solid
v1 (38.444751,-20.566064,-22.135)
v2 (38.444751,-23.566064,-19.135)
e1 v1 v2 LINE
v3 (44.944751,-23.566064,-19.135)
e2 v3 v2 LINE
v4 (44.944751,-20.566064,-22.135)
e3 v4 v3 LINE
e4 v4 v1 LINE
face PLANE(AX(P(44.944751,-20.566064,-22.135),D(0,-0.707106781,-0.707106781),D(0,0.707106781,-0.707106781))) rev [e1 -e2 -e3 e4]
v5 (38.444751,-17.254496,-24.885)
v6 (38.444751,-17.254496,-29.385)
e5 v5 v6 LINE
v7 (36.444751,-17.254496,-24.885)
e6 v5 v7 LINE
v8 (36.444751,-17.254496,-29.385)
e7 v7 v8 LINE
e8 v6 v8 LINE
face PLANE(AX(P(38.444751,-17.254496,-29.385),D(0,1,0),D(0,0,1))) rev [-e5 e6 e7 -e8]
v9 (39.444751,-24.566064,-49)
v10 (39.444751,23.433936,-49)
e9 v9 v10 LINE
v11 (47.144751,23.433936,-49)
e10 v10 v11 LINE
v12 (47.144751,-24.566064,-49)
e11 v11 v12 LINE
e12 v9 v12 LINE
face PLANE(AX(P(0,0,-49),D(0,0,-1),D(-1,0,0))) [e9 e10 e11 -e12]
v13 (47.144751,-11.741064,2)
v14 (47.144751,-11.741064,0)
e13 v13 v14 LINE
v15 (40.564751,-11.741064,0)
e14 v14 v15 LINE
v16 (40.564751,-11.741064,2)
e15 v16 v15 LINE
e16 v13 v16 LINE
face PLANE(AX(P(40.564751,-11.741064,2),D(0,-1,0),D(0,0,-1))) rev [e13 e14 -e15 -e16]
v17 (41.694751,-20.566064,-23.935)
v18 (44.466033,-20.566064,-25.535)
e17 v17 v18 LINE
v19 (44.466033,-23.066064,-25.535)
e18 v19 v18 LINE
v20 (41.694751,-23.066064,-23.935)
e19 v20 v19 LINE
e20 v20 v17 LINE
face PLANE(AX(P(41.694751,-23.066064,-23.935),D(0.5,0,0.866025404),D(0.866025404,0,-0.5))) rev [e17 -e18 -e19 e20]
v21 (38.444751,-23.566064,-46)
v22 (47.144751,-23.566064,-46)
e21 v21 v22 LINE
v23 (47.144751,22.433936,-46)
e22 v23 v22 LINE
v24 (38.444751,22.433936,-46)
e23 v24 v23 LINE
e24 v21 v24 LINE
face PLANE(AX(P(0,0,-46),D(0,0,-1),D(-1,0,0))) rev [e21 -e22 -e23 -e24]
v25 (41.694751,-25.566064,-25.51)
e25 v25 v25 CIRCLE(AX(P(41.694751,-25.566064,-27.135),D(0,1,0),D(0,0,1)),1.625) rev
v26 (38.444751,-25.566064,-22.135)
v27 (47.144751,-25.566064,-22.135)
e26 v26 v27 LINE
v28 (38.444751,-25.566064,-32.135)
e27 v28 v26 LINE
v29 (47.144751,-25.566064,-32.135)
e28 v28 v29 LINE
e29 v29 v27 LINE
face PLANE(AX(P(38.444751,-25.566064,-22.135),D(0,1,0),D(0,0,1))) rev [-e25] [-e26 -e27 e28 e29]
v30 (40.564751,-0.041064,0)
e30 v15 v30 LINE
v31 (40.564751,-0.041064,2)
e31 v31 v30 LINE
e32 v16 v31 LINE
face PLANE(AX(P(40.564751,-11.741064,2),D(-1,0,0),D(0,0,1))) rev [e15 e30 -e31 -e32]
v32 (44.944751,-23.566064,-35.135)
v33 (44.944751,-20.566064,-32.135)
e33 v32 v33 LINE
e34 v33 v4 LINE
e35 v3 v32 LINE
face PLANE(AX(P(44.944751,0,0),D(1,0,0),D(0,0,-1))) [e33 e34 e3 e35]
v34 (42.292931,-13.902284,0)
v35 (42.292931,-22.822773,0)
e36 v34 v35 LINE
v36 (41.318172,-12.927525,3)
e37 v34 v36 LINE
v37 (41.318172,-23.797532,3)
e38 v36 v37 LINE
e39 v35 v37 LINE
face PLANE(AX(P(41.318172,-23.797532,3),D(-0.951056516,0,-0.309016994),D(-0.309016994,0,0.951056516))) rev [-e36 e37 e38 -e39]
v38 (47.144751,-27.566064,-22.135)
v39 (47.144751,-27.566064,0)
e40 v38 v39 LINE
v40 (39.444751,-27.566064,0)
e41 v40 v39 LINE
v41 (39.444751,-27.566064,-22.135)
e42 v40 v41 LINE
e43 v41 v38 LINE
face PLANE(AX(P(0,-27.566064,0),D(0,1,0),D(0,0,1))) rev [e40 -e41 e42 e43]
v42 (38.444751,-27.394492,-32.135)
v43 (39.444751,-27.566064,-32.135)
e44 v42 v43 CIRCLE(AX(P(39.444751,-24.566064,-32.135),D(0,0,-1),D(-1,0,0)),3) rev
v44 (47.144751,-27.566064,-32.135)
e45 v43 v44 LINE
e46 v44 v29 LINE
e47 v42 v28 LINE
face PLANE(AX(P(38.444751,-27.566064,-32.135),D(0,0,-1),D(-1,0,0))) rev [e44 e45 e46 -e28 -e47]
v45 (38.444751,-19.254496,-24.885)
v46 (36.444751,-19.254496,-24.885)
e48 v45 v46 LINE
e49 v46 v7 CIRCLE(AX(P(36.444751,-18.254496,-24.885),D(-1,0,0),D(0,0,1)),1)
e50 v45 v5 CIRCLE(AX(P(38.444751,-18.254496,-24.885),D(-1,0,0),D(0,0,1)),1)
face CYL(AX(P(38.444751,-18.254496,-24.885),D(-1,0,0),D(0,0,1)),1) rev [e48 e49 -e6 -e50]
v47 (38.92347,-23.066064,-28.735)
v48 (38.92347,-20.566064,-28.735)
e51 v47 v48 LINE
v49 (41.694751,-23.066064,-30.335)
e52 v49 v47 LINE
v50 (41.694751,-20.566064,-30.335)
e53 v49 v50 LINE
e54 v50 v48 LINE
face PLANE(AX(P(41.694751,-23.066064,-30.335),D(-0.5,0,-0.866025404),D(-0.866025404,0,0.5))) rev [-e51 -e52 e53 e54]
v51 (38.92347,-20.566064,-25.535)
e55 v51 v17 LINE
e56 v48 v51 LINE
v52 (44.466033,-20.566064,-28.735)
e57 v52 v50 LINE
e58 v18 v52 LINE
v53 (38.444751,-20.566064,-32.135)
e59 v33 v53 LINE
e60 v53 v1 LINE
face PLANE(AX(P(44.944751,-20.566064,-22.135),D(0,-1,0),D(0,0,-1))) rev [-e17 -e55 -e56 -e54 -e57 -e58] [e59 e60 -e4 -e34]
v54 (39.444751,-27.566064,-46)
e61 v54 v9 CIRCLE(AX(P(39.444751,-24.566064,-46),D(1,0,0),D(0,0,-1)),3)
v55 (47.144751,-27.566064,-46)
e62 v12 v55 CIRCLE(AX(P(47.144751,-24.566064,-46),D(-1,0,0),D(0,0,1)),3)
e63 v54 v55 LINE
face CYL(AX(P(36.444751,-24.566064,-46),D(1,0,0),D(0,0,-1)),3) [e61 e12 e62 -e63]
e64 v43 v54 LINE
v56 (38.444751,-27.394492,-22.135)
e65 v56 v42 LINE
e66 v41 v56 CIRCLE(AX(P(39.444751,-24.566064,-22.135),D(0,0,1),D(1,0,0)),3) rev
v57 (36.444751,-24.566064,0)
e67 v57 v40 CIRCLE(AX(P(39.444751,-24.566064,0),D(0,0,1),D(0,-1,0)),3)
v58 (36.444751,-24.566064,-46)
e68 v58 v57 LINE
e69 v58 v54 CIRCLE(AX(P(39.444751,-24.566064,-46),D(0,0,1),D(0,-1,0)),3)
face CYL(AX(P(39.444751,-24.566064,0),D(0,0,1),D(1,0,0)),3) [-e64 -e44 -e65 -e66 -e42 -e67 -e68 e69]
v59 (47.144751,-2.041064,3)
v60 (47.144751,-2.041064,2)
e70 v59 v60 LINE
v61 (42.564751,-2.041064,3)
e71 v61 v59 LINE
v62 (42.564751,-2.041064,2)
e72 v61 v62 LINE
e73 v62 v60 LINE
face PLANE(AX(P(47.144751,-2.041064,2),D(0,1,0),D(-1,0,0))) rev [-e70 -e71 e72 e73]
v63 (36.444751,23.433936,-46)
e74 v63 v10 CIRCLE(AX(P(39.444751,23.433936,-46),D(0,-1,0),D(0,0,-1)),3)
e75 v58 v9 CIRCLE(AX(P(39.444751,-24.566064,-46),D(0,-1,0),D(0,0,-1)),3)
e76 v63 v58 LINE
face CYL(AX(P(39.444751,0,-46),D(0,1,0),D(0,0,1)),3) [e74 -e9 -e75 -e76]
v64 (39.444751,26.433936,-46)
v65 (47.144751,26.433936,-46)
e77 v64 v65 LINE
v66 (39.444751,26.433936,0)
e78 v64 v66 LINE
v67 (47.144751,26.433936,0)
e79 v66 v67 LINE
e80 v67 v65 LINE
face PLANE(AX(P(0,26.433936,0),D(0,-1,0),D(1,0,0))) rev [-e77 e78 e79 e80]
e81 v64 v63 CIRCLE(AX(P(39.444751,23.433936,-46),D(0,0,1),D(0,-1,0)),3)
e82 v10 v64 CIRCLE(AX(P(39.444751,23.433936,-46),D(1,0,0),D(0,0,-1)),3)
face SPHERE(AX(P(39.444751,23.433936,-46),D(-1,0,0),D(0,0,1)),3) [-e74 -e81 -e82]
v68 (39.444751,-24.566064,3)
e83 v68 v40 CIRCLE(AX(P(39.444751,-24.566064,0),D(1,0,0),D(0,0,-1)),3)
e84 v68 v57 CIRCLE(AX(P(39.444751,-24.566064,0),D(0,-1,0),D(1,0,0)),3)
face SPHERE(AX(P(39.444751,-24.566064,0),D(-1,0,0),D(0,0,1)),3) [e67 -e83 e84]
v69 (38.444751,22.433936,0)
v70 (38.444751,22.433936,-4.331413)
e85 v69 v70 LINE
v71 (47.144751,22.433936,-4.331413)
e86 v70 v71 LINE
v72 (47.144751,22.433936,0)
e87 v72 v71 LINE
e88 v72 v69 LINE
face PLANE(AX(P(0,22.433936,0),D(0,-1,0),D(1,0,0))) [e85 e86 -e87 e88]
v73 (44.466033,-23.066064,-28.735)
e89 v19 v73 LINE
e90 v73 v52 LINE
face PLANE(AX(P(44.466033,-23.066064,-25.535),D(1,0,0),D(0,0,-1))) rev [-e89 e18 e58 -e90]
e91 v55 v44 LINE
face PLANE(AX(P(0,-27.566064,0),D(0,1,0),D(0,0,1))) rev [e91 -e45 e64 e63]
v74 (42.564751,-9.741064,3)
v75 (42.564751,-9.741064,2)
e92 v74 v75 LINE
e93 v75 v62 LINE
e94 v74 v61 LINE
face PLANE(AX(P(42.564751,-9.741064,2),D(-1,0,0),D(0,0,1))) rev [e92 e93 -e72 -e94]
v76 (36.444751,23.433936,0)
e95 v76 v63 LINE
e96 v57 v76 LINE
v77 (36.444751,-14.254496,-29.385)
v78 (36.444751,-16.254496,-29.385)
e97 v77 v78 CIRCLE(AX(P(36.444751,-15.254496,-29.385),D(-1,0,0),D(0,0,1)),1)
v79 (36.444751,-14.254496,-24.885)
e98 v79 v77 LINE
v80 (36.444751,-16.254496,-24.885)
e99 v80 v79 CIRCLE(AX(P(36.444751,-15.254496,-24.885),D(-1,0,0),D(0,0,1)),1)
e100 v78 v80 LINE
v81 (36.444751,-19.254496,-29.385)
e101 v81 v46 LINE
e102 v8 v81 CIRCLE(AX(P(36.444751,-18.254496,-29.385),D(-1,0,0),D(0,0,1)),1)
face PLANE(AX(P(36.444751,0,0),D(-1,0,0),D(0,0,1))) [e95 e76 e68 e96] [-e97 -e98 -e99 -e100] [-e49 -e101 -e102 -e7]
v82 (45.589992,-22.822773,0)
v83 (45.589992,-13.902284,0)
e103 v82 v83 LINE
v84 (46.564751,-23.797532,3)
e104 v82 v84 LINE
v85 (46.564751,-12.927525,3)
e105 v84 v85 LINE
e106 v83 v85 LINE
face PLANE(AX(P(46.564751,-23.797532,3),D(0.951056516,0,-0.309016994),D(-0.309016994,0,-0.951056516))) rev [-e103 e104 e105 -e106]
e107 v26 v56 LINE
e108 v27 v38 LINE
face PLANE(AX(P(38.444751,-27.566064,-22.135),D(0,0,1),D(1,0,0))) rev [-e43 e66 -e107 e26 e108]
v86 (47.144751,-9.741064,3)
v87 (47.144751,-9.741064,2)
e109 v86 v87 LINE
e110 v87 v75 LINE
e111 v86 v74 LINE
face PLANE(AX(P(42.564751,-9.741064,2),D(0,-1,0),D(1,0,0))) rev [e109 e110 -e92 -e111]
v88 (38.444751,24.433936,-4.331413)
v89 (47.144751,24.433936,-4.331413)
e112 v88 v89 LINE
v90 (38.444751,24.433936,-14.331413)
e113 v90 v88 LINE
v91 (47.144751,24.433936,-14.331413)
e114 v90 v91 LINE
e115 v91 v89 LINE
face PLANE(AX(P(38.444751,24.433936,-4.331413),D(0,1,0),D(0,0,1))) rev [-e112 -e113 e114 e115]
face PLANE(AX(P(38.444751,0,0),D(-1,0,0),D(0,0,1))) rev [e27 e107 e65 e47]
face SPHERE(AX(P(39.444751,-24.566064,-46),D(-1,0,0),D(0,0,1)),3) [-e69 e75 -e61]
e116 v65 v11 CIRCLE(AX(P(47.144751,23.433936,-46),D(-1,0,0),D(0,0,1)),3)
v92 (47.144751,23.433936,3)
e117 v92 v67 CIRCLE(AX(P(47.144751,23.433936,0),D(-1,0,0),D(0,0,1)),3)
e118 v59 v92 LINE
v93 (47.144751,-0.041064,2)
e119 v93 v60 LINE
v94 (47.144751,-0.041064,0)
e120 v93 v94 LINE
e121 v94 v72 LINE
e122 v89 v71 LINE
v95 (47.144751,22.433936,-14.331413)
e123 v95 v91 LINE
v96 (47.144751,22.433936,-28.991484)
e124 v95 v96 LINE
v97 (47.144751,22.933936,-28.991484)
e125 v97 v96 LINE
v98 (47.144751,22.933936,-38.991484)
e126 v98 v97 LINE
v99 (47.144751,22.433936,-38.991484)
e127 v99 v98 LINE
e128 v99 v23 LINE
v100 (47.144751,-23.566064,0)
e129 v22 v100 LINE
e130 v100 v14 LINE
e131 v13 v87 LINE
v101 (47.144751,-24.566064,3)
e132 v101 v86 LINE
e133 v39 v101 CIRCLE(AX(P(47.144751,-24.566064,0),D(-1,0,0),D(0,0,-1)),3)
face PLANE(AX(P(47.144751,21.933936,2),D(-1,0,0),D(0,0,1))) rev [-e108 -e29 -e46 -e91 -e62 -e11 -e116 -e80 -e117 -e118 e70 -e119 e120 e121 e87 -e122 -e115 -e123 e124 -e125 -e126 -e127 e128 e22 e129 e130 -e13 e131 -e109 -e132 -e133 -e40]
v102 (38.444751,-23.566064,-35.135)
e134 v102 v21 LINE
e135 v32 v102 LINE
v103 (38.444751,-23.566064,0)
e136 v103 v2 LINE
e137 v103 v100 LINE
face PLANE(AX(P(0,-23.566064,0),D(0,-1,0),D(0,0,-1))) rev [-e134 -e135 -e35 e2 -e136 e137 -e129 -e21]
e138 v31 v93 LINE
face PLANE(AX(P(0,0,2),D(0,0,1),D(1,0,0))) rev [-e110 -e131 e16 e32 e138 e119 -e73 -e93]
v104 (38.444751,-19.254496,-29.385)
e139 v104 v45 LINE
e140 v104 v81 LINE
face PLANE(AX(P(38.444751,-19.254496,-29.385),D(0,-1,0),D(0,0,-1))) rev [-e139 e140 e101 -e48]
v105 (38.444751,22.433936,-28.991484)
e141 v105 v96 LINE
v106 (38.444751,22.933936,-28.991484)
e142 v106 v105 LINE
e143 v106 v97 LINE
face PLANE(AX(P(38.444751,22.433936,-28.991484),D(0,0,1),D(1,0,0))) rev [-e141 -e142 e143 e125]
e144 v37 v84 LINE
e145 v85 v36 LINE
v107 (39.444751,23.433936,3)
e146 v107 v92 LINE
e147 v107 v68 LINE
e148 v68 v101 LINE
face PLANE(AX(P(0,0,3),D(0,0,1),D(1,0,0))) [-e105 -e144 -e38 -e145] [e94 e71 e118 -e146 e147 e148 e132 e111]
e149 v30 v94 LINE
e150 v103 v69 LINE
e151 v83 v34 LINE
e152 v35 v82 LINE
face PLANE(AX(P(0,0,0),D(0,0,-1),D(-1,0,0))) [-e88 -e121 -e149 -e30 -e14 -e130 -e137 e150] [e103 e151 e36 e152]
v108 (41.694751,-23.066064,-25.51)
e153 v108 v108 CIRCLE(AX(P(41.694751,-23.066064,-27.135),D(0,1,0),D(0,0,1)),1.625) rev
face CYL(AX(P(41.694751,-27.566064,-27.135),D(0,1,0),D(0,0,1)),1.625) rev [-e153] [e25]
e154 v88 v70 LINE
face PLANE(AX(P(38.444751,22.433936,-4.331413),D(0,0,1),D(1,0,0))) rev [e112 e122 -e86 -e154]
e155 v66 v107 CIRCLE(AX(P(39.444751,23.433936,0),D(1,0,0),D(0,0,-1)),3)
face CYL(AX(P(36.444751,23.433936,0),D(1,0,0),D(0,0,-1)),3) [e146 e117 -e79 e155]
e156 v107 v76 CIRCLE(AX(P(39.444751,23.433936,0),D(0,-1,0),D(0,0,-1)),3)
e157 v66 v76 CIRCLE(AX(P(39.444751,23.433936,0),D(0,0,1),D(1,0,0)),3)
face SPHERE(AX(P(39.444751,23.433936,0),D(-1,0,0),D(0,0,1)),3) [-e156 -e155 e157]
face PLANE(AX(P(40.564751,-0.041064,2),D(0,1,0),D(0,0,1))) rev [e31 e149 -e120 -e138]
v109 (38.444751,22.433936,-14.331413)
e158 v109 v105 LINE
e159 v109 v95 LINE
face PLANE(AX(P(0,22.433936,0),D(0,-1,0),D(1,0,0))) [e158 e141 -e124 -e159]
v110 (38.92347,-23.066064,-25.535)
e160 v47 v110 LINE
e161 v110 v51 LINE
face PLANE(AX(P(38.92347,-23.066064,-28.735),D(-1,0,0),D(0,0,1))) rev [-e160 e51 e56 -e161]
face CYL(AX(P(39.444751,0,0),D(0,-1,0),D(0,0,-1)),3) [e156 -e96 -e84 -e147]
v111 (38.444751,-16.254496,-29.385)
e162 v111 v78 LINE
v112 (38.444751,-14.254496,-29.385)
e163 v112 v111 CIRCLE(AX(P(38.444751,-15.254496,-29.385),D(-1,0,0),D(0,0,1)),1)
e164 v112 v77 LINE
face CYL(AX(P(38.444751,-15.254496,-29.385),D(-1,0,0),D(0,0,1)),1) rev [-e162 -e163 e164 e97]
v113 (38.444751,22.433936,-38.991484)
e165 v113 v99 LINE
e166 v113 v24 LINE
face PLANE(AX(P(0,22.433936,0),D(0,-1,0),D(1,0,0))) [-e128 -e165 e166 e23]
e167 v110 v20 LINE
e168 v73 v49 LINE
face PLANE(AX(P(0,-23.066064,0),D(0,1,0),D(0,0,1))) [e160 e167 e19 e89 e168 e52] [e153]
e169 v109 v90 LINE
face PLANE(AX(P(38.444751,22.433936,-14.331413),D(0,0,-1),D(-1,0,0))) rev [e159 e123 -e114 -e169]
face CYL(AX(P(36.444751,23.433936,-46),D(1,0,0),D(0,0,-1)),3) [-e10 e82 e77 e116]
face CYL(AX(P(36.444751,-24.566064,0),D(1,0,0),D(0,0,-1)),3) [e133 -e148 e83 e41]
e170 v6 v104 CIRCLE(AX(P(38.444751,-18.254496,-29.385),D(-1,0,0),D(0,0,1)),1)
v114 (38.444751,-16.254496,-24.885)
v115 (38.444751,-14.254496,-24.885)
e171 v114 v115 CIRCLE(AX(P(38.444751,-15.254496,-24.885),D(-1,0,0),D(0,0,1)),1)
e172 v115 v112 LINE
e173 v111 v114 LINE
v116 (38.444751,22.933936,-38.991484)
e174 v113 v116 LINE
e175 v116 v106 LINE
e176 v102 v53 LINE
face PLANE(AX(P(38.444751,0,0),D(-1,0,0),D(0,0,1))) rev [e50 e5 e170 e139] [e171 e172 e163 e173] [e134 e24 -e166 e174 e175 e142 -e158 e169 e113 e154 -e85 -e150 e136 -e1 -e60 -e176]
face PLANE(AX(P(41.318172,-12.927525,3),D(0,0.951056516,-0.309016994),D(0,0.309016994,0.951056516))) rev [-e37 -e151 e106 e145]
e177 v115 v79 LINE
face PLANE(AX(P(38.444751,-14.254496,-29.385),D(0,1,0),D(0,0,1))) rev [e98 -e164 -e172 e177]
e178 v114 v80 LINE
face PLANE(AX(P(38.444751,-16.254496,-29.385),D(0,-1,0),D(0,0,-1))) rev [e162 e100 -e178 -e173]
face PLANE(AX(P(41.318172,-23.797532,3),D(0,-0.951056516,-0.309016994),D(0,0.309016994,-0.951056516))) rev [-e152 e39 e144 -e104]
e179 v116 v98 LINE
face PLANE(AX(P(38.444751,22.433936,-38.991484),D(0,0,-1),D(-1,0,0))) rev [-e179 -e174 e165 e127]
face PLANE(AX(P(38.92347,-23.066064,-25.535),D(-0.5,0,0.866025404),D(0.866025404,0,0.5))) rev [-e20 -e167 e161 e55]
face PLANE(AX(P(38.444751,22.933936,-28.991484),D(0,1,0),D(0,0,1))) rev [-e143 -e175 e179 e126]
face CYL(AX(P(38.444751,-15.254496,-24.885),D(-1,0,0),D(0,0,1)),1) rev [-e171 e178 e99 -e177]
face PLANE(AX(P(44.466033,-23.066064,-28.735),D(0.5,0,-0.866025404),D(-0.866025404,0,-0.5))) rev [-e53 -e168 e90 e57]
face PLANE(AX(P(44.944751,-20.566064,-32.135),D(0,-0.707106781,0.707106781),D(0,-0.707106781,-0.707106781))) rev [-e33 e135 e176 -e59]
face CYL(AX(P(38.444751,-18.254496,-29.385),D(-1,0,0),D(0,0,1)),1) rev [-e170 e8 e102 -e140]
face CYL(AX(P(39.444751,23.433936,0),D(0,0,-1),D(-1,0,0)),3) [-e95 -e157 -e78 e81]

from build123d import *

# Parameters (mm, degrees)
CROQUIS1_W                   = 3.246579248
CROQUIS1_H                   = 8.852829877
SALIENTE_EXTRUIR1_DEPTH      = 2
CROQUIS5_W                   = 9
CROQUIS5_H                   = 0.5
ARREGLO_IMPRESION1_DEPTH     = 2
CROQUIS6_W                   = 9
CROQUIS6_H                   = 48
SALIENTE_EXTRUIR4_DEPTH      = 2
CROQUIS7_W                   = 9
CROQUIS7_H                   = 48
SALIENTE_EXTRUIR5_DEPTH      = 2
CROQUIS8_W                   = 9
CROQUIS8_H                   = 50
SALIENTE_EXTRUIR6_DEPTH      = 2
SALIENTE_EXTRUIR7_DEPTH      = 1.7
SALIENTE_EXTRUIR7_DEPTH_BACK = 0.3
CROQUIS9_W                   = 50
CROQUIS9_H                   = 50
CROQUIS10_W                  = 10
CROQUIS10_H                  = 0.5
CORTAR_EXTRUIR1_DEPTH        = 8.700001
CROQUIS11_W                  = 3.246579248
CROQUIS11_H                  = 8.852829877
SALIENTE_EXTRUIR8_DEPTH      = 1
CROQUIS12_W                  = 10.7
CROQUIS12_H                  = 51
SALIENTE_EXTRUIR9_DEPTH      = 2
CROQUIS13_W                  = 10.7
CROQUIS13_H                  = 52
SALIENTE_EXTRUIR10_DEPTH     = 1
CROQUIS14_W                  = 10.7
CROQUIS14_H                  = 52
SALIENTE_EXTRUIR11_DEPTH     = 2
SALIENTE_EXTRUIR12_DEPTH     = 6.5
CORTAR_EXTRUIR2_START        = -7
CROQUIS19_R                  = 1.625
CORTAR_EXTRUIR2_DEPTH        = 7
CORTAR_EXTRUIR3_DEPTH        = 2.5
CROQUIS22_W                  = 10
CROQUIS22_H                  = 2
CORTAR_EXTRUIR4_DEPTH        = 8.7
CORTAR_EXTRUIR5_START        = -10.7
CORTAR_EXTRUIR5_DEPTH        = 10.7
REDONDEO4_R                  = 3
CROQUIS24_W                  = 5.246579248
CROQUIS24_H                  = 10.87000641
CORTAR_EXTRUIR6_DEPTH        = 3
CORTAR_EXTRUIR6_DRAFT        = -18
CROQUIS25_W                  = 6.58
CROQUIS25_H                  = 11.7
CORTAR_EXTRUIR7_DEPTH        = 2


with BuildPart() as part:
    # Croquis1 → Saliente-Extruir1 (new body)
    with BuildSketch(Plane.XY):
        Polygon((47.144751496, 21.933935563), (38.144751496, 21.933935563), (38.144751496, -23.066064437), (47.144751496, -23.066064437), (47.144751496, -9.741064437), (42.564751496, -9.741064437), (42.564751496, -2.041064437), (47.144751496, -2.041064437), align=None)
        with Locations((43.941461872, -18.353940173)):
            Rectangle(CROQUIS1_W, CROQUIS1_H, mode=Mode.SUBTRACT)
    extrude(amount=SALIENTE_EXTRUIR1_DEPTH)

    # Croquis5 → Arreglo_impresion1 (add)
    with BuildSketch(Plane.XY.offset(2)):
        with Locations((42.644751496, -23.316064437)):
            Rectangle(CROQUIS5_W, CROQUIS5_H)
        with Locations((42.644751496, 22.183935563)):
            Rectangle(CROQUIS5_W, CROQUIS5_H)
    extrude(amount=-ARREGLO_IMPRESION1_DEPTH)

    # Croquis6 → Saliente-Extruir4 (add)
    with BuildSketch(Plane.XZ.offset(23.566064437)):
        with Locations((42.644751496, -22)):
            Rectangle(CROQUIS6_W, CROQUIS6_H)
    extrude(amount=SALIENTE_EXTRUIR4_DEPTH)

    # Croquis7 → Saliente-Extruir5 (add)
    with BuildSketch(Plane(origin=(0, 0, -46), x_dir=(-1, 0, 0), z_dir=(0, 0, -1))):
        with Locations((-42.644751496, -1.566064437)):
            Rectangle(CROQUIS7_W, CROQUIS7_H)
    extrude(amount=SALIENTE_EXTRUIR5_DEPTH)

    # Croquis8 → Saliente-Extruir6 (add)
    with BuildSketch(Plane(origin=(0, 22.433935563, 0), x_dir=(1, 0, 0), z_dir=(0, 1, 0))):
        with Locations((42.644751496, 23)):
            Rectangle(CROQUIS8_W, CROQUIS8_H)
    extrude(amount=SALIENTE_EXTRUIR6_DEPTH)

    # Croquis9 → Saliente-Extruir7 (add, two sides: drawn at the far end of the back side and taken through both)
    with BuildSketch(Plane.ZY.offset(-38.144751496).offset(-SALIENTE_EXTRUIR7_DEPTH_BACK)):
        with Locations((-23, -0.566064437)):
            Rectangle(CROQUIS9_W, CROQUIS9_H)
        with BuildLine():
            Line((-29.385, -14.254496437), (-24.885, -14.254496437))
            ThreePointArc((-24.885, -14.254496437), (-23.885, -15.254496437), (-24.885, -16.254496437))
            Line((-24.885, -16.254496437), (-29.385, -16.254496437))
            ThreePointArc((-29.385, -16.254496437), (-30.385, -15.254496437), (-29.385, -14.254496437))
        make_face(mode=Mode.SUBTRACT)
        with BuildLine():
            Line((-29.385, -17.254496437), (-24.885, -17.254496437))
            ThreePointArc((-24.885, -17.254496437), (-23.885, -18.254496437), (-24.885, -19.254496437))
            Line((-24.885, -19.254496437), (-29.385, -19.254496437))
            ThreePointArc((-29.385, -19.254496437), (-30.385, -18.254496437), (-29.385, -17.254496437))
        make_face(mode=Mode.SUBTRACT)
    extrude(amount=SALIENTE_EXTRUIR7_DEPTH + SALIENTE_EXTRUIR7_DEPTH_BACK)

    # Croquis10 → Cortar-Extruir1 (cut)
    with BuildSketch(Plane(origin=(47.144751496, 0, 0), x_dir=(0, 0, -1), z_dir=(1, 0, 0))):
        with Locations((33.991483973, 22.683935563)):
            Rectangle(CROQUIS10_W, CROQUIS10_H)
    extrude(amount=-CORTAR_EXTRUIR1_DEPTH, mode=Mode.SUBTRACT)

    # Croquis11 → Saliente-Extruir8 (add)
    with BuildSketch(Plane.XY.offset(2)):
        Polygon((47.144751496, 24.433935563), (36.444751496, 24.433935563), (36.444751496, -25.566064437), (47.144751496, -25.566064437), (47.144751496, -9.741064437), (42.564751496, -9.741064437), (42.564751496, -2.041064437), (47.144751496, -2.041064437), align=None)
        with Locations((43.941461872, -18.353940173)):
            Rectangle(CROQUIS11_W, CROQUIS11_H, mode=Mode.SUBTRACT)
    extrude(amount=SALIENTE_EXTRUIR8_DEPTH)

    # Croquis12 → Saliente-Extruir9 (add)
    with BuildSketch(Plane.XZ.offset(25.566064437)):
        with Locations((41.794751496, -22.5)):
            Rectangle(CROQUIS12_W, CROQUIS12_H)
    extrude(amount=SALIENTE_EXTRUIR9_DEPTH)

    # Croquis13 → Saliente-Extruir10 (add)
    with BuildSketch(Plane(origin=(0, 0, -48), x_dir=(-1, 0, 0), z_dir=(0, 0, -1))):
        with Locations((-41.794751496, -1.566064437)):
            Rectangle(CROQUIS13_W, CROQUIS13_H)
    extrude(amount=SALIENTE_EXTRUIR10_DEPTH)

    # Croquis14 → Saliente-Extruir11 (add)
    with BuildSketch(Plane(origin=(0, 24.433935563, 0), x_dir=(1, 0, 0), z_dir=(0, 1, 0))):
        with Locations((41.794751496, 23)):
            Rectangle(CROQUIS14_W, CROQUIS14_H)
    extrude(amount=SALIENTE_EXTRUIR11_DEPTH)

    # Croquis17 → Saliente-Extruir12 (add)
    with BuildSketch(Plane(origin=(38.444751496, 0, 0), x_dir=(0, 0, -1), z_dir=(1, 0, 0))):
        Polygon((22.135, -20.566064437), (32.135, -20.566064437), (35.135, -23.566064437), (19.135, -23.566064437), align=None)
    extrude(amount=SALIENTE_EXTRUIR12_DEPTH)

    # Croquis19 → Cortar-Extruir2 (cut)
    with BuildSketch(Plane(origin=(0, -20.566064437, 0), x_dir=(1, 0, 0), z_dir=(0, 1, 0)).offset(CORTAR_EXTRUIR2_START)):
        with Locations(Location((41.694751496, 27.135, 0), (0, 0, 270))):
            Circle(CROQUIS19_R)
    extrude(amount=CORTAR_EXTRUIR2_DEPTH, mode=Mode.SUBTRACT)

    # Croquis20 → Cortar-Extruir3 (cut)
    with BuildSketch(Plane(origin=(0, -20.566064437, 0), x_dir=(1, 0, 0), z_dir=(0, 1, 0))):
        Polygon((41.694751496, 30.335), (38.923470204, 28.735), (38.923470204, 25.535), (41.694751496, 23.935), (44.466032788, 25.535), (44.466032788, 28.735), align=None)
    extrude(amount=-CORTAR_EXTRUIR3_DEPTH, mode=Mode.SUBTRACT)

    # Croquis22 → Cortar-Extruir4 (cut)
    with BuildSketch(Plane(origin=(47.144751496, 0, 0), x_dir=(0, 0, -1), z_dir=(1, 0, 0))):
        with Locations((27.135, -26.566064437)):
            Rectangle(CROQUIS22_W, CROQUIS22_H)
        with Locations((9.331412976, 23.433935563)):
            Rectangle(CROQUIS22_W, CROQUIS22_H)
    extrude(amount=-CORTAR_EXTRUIR4_DEPTH, mode=Mode.SUBTRACT)

    # Croquis23 → Cortar-Extruir5 (cut)
    with BuildSketch(Plane(origin=(47.144751496, 0, 0), x_dir=(0, 0, -1), z_dir=(1, 0, 0)).offset(CORTAR_EXTRUIR5_START)):
        with BuildLine():
            Line((-3, -27.566064437), (0, -27.566064437))
            ThreePointArc((0, -27.566064437), (-2.121320344, -26.687384781), (-3, -24.566064437))
            Line((-3, -24.566064437), (-3, -27.566064437))
        make_face()
        with BuildLine():
            Line((-3, 26.433935563), (0, 26.433935563))
            ThreePointArc((0, 26.433935563), (-2.121320344, 25.555255907), (-3, 23.433935563))
            Line((-3, 23.433935563), (-3, 26.433935563))
        make_face()
        with BuildLine():
            Line((49, 26.433935563), (49, 23.433935563))
            ThreePointArc((49, 23.433935563), (48.121320344, 25.555255907), (46, 26.433935563))
            Line((46, 26.433935563), (49, 26.433935563))
        make_face()
        with BuildLine():
            Line((49, -27.566064437), (46, -27.566064437))
            ThreePointArc((46, -27.566064437), (48.121320344, -26.687384781), (49, -24.566064437))
            Line((49, -24.566064437), (49, -27.566064437))
        make_face()
    extrude(amount=CORTAR_EXTRUIR5_DEPTH, mode=Mode.SUBTRACT)

    # Redondeo4
    # the kernel refuses this fillet: 3 mm, written as the material it takes off along each edge
    with BuildSketch(Plane(origin=(36.444751496, -24.566064437, 0), x_dir=(0, -1, 0), z_dir=(0, 0, -1))) as redondeo4_piece_1:
        with BuildLine():
            CenterArc((3 - REDONDEO4_R, -REDONDEO4_R), REDONDEO4_R, 360, 90)
            Line((3, -REDONDEO4_R), (3, 0))
            Line((3, 0), (3 - REDONDEO4_R, 0))
        make_face()
    revolve(axis=Axis((36.444751496, -24.566064437, 0), (-1, 0, 0)), revolution_arc=90, mode=Mode.SUBTRACT)
    with BuildSketch(Plane(origin=(36.444751496, -24.566064437, 3), x_dir=(0, 0, -1), z_dir=(0, 1, 0)), Plane(origin=(36.444751496, 23.433935563, -49), x_dir=(0, 0, 1), z_dir=(0, -1, 0))) as redondeo4_piece_2:
        with BuildLine():
            CenterArc((REDONDEO4_R, -REDONDEO4_R), REDONDEO4_R, 90, 90)
            Line((0, -REDONDEO4_R), (0, 0))
            Line((0, 0), (REDONDEO4_R, 0))
        make_face()
    extrude(amount=48, mode=Mode.SUBTRACT)
    with BuildSketch(Plane(origin=(36.444751496, 23.433935563, 0), x_dir=(0, 1, 0), z_dir=(0, 0, -1))) as redondeo4_piece_3:
        with BuildLine():
            CenterArc((3 - REDONDEO4_R, REDONDEO4_R), REDONDEO4_R, 270, 90)
            Line((3, REDONDEO4_R), (3, 0))
            Line((3, 0), (3 - REDONDEO4_R, 0))
        make_face()
    revolve(axis=Axis((36.444751496, 23.433935563, 0), (1, 0, 0)), revolution_arc=90, mode=Mode.SUBTRACT)
    with BuildSketch(Plane(origin=(36.444751496, 26.433935563, -46), x_dir=(0, -1, 0), z_dir=(0, 0, 1))) as redondeo4_piece_4:
        with BuildLine():
            CenterArc((REDONDEO4_R, REDONDEO4_R), REDONDEO4_R, 180, 90)
            Line((0, REDONDEO4_R), (0, 0))
            Line((0, 0), (REDONDEO4_R, 0))
        make_face()
    extrude(amount=46, mode=Mode.SUBTRACT)
    with BuildSketch(Plane(origin=(36.444751496, 23.433935563, -46), x_dir=(0, 0, -1), z_dir=(0, -1, 0))) as redondeo4_piece_5:
        with BuildLine():
            CenterArc((3 - REDONDEO4_R, REDONDEO4_R), REDONDEO4_R, 270, 90)
            Line((3, REDONDEO4_R), (3, 0))
            Line((3, 0), (3 - REDONDEO4_R, 0))
        make_face()
    revolve(axis=Axis((36.444751496, 23.433935563, -46), (1, 0, 0)), revolution_arc=90, mode=Mode.SUBTRACT)
    with BuildSketch(Plane(origin=(36.444751496, -24.566064437, -46), x_dir=(0, -1, 0), z_dir=(0, 0, 1))) as redondeo4_piece_6:
        with BuildLine():
            CenterArc((3 - REDONDEO4_R, REDONDEO4_R), REDONDEO4_R, 270, 90)
            Line((3, REDONDEO4_R), (3, 0))
            Line((3, 0), (3 - REDONDEO4_R, 0))
        make_face()
    revolve(axis=Axis((36.444751496, -24.566064437, -46), (1, 0, 0)), revolution_arc=90, mode=Mode.SUBTRACT)
    with BuildSketch(Plane(origin=(36.444751496, -27.566064437, -46), x_dir=(0, 1, 0), z_dir=(0, 0, 1))) as redondeo4_piece_7:
        with BuildLine():
            CenterArc((REDONDEO4_R, -REDONDEO4_R), REDONDEO4_R, 90, 90)
            Line((0, -REDONDEO4_R), (0, 0))
            Line((0, 0), (REDONDEO4_R, 0))
        make_face()
    extrude(amount=46, mode=Mode.SUBTRACT)


with BuildPart() as cortar_extruir6_tool:
    # Croquis24 → Cortar-Extruir6 (with draft: the straight prism first)
    with BuildSketch(Plane.XY.offset(3)):
        with Locations((43.941461872, -18.36252844)):
            Rectangle(CROQUIS24_W, CROQUIS24_H)
    extrude(amount=-CORTAR_EXTRUIR6_DEPTH)
    # Cortar-Extruir6: the draft: its side faces are tilted about the plane it starts from
    cortar_extruir6_sides = [cortar_extruir6_tool.faces().sort_by_distance(p)[0] for p in [
        (43.941461872, -23.797531645, 1.5),
        (46.564751496, -18.36252844, 1.5),
        (43.941461872, -12.927525235, 1.5),
        (41.318172248, -18.36252844, 1.5),
    ]]
    draft(cortar_extruir6_sides, Plane.XY.offset(3), CORTAR_EXTRUIR6_DRAFT)


with BuildPart() as part_1:
    add(part.part)

    # Cortar-Extruir6: cut by cortar_extruir6_tool
    add(cortar_extruir6_tool.part, mode=Mode.SUBTRACT)

    # Croquis25 → Cortar-Extruir7 (cut)
    with BuildSketch(Plane(origin=(0, 0, 0), x_dir=(-1, 0, 0), z_dir=(0, 0, -1))):
        with Locations((-43.854751496, -5.891064437)):
            Rectangle(CROQUIS25_W, CROQUIS25_H)
    extrude(amount=-CORTAR_EXTRUIR7_DEPTH, mode=Mode.SUBTRACT)


solid = part_1.part
